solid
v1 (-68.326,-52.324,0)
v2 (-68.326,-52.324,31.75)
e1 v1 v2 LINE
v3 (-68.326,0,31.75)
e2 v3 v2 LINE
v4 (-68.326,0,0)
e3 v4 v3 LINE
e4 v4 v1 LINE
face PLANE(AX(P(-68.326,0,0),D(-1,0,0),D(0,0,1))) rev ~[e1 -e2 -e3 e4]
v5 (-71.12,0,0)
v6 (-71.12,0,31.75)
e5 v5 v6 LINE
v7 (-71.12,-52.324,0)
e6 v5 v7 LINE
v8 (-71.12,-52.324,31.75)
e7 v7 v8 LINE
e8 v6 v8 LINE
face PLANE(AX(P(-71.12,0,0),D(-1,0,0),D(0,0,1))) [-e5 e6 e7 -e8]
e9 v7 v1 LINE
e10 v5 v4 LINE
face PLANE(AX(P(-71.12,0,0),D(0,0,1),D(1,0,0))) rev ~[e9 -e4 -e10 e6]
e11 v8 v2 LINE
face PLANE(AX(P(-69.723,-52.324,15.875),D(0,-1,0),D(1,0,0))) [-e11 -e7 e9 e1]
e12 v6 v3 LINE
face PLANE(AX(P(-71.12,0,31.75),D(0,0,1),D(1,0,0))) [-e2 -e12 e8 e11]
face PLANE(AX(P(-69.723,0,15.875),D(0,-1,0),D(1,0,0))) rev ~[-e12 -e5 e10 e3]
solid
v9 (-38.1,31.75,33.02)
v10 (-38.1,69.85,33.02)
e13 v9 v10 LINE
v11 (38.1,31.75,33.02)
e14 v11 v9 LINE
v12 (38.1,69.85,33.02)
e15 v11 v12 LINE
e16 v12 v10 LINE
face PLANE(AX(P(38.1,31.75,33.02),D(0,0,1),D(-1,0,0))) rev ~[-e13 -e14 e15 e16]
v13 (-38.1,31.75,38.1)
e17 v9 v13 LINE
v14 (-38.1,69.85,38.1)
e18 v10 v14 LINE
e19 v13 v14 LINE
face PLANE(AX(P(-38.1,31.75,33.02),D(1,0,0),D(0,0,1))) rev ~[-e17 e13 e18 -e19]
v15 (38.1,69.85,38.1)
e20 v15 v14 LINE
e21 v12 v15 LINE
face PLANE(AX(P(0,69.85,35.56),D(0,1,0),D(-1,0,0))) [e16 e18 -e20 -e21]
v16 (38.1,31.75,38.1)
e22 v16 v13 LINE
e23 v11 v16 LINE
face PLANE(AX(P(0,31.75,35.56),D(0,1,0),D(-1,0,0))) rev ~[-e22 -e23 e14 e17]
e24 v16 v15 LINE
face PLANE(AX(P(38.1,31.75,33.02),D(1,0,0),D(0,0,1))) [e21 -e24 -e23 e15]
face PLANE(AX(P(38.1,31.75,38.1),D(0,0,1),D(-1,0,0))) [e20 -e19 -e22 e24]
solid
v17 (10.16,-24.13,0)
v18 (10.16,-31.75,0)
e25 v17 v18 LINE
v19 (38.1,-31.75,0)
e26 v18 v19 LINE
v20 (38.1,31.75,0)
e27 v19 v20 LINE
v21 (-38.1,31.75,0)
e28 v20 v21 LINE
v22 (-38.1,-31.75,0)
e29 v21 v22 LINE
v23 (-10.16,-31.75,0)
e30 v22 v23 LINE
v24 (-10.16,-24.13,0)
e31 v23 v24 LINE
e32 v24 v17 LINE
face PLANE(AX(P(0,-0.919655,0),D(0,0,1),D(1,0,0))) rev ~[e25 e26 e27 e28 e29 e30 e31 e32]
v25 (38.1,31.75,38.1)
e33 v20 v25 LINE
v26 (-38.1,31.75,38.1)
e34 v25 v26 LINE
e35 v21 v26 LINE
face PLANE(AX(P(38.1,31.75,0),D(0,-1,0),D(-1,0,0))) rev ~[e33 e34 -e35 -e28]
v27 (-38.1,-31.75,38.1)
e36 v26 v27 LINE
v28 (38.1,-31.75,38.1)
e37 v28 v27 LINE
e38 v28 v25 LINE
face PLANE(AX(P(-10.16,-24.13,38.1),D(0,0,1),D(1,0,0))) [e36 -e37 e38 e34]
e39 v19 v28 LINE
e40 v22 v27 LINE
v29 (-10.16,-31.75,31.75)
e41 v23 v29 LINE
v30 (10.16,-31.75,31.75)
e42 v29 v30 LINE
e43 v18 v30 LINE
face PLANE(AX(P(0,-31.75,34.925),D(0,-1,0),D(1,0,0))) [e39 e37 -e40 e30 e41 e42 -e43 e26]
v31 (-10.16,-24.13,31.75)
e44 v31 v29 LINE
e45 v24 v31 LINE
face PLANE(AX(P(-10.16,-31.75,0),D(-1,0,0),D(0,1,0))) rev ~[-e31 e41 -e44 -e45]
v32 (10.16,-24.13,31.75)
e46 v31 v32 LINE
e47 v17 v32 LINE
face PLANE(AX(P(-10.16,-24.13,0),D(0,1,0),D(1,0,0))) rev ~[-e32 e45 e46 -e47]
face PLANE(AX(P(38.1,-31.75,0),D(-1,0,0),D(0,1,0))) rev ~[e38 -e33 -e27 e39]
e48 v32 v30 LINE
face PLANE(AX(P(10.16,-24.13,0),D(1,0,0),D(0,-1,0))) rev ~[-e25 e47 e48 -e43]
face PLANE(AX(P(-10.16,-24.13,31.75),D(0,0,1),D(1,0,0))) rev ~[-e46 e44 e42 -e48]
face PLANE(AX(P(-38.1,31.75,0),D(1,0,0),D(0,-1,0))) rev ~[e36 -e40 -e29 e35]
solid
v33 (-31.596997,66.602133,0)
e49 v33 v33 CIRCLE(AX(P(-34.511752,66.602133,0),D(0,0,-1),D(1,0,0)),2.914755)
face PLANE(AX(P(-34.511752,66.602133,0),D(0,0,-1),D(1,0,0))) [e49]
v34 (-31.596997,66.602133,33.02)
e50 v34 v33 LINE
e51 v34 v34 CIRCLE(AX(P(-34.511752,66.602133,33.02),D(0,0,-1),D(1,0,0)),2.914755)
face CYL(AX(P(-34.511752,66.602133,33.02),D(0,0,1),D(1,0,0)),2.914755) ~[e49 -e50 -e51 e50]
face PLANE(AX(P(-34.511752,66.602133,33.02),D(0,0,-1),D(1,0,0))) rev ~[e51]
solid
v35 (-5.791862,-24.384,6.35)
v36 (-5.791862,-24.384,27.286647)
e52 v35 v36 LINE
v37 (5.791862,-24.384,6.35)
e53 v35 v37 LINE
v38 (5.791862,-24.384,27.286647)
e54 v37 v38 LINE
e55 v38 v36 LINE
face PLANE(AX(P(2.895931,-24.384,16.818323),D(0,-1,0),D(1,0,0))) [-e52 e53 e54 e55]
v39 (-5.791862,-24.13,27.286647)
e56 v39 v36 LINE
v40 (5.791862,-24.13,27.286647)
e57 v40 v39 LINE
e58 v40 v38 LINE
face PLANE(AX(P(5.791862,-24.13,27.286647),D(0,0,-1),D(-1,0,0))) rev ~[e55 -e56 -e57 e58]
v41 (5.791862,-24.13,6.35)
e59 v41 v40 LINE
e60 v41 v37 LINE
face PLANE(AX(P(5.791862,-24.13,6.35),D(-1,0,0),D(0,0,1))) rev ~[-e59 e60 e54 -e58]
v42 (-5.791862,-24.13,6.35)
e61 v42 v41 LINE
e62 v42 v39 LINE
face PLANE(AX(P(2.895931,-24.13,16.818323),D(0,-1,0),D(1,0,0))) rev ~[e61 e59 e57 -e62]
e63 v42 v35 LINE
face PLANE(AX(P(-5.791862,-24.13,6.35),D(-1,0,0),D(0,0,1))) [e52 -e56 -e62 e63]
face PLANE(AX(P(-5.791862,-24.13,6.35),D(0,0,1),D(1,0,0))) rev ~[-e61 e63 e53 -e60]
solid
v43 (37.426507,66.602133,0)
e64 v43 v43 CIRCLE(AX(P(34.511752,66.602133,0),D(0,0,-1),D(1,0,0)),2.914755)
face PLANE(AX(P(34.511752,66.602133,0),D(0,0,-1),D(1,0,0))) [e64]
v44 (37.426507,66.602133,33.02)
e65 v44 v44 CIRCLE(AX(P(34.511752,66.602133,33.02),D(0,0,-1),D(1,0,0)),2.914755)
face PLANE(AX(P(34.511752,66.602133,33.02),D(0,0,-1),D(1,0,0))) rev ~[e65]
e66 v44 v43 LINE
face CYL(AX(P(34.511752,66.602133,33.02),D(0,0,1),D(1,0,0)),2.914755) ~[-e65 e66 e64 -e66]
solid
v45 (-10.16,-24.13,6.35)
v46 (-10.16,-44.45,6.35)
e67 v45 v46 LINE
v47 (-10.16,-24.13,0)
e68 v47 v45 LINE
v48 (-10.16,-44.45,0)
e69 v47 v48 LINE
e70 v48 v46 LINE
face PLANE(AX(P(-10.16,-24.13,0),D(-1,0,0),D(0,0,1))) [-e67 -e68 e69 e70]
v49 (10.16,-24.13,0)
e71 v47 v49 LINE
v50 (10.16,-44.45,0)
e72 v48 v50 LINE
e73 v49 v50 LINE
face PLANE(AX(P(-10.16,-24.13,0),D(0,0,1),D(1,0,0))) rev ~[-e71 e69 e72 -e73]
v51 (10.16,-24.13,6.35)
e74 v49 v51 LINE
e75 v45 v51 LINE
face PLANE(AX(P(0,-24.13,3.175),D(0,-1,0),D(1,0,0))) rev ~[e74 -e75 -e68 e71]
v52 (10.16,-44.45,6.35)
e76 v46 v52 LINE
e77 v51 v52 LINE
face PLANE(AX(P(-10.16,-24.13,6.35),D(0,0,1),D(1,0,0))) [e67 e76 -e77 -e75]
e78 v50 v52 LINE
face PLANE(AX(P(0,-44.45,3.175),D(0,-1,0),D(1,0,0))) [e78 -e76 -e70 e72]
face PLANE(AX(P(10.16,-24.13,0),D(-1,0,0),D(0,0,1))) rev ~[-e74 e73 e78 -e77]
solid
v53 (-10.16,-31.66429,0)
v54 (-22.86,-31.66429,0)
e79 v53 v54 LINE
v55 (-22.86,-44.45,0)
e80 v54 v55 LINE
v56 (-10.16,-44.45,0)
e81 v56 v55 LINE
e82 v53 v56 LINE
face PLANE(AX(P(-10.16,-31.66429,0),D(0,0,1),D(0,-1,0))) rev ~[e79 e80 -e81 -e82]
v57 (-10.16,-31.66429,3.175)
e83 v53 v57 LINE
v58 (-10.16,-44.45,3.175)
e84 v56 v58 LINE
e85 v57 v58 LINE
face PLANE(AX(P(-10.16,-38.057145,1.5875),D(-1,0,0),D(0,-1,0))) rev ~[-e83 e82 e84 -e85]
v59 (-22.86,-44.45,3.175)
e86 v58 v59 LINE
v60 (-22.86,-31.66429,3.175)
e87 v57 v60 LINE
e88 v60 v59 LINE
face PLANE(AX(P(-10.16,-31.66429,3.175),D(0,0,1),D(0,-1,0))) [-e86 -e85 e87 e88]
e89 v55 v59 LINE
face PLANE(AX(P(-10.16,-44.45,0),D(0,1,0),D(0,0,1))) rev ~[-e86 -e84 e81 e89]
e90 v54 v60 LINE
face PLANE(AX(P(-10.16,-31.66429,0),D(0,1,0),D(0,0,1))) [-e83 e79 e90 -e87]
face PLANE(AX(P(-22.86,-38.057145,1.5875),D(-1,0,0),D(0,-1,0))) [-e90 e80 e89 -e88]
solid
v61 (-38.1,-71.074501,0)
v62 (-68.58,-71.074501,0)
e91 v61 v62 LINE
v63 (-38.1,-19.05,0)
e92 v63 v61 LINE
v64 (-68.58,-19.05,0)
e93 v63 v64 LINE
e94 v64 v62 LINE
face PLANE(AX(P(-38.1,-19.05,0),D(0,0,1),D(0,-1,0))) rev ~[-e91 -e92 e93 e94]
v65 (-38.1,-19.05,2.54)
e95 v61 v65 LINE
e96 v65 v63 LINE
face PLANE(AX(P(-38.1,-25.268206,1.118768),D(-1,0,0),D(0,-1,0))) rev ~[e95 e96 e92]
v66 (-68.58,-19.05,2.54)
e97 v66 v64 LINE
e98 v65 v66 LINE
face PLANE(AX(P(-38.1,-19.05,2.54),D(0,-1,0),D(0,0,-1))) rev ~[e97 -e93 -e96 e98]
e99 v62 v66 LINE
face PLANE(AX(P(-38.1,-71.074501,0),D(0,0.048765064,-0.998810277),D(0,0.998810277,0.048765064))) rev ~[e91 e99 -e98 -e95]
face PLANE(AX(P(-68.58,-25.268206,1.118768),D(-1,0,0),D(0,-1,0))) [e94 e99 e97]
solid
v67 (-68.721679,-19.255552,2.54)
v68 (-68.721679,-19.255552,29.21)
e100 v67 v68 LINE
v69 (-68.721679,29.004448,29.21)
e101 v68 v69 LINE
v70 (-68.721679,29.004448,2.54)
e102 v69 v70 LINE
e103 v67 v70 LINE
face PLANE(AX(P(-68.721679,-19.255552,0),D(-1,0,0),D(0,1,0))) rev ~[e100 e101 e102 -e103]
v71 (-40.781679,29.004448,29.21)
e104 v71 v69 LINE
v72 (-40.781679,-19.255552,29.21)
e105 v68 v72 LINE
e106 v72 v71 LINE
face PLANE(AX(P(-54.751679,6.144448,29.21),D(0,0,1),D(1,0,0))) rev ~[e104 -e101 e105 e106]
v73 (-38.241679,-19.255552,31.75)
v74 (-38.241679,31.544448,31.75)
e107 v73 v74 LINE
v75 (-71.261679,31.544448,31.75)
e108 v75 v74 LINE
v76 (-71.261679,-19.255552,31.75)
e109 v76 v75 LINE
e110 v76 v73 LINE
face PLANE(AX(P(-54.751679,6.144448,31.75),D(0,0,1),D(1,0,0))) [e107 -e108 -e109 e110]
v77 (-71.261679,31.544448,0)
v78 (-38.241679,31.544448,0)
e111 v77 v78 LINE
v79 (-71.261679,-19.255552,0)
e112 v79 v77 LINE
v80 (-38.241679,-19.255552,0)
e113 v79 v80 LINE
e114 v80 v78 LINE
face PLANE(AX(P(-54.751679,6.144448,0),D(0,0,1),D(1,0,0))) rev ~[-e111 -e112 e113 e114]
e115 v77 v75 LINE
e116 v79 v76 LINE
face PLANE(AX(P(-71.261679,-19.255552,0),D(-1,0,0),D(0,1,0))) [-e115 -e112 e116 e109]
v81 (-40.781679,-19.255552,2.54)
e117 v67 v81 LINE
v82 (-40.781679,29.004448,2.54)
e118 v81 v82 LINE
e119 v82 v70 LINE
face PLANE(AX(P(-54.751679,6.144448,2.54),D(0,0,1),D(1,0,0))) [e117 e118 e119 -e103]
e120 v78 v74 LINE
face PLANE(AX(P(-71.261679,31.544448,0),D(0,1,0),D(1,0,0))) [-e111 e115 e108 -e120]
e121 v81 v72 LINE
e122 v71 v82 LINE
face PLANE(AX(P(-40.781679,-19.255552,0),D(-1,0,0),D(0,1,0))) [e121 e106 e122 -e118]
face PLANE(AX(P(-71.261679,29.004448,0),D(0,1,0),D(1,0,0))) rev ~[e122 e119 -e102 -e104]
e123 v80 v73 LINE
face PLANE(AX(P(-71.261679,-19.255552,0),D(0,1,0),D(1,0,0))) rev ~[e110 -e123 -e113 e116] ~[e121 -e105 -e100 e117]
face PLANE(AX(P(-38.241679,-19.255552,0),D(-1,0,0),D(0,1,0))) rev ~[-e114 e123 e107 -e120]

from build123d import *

# Parameters (mm, degrees)
F1_DEPTH  = 38.1
F2_W      = 76.2
F2_H      = 5.08
F3_DEPTH  = 38.1
F5_W      = 20.32
F5_H      = 6.35
F6_DEPTH  = 7.62
F8_W      = 2.794
F8_H      = 31.75
F9_DEPTH  = 52.324
F10_DEPTH = 20.32
F11_W     = 12.7857104659
F11_H     = 3.175
F12_DEPTH = 12.7
F13_W     = 5.791861964
F13_H     = 20.9366468877
F14_DEPTH = 0.254
F15_W     = 33.02
F15_H     = 50.8
F16_DEPTH = 31.75
F17_DEPTH = 30.48
F18_T     = -2.54
F19_R     = 2.9147550464
F20_DEPTH = 33.02


with BuildPart() as f1:
    # F0 (on Top) → F1 (new body)
    with BuildSketch(Plane.XY):
        Polygon((-38.1, -31.75), (-10.16, -31.75), (-10.16, -24.13), (10.16, -24.13), (10.16, -31.75), (38.1, -31.75), (38.1, 31.75), (-38.1, 31.75), (-38.1, -19.05), align=None)
    extrude(amount=F1_DEPTH)

    # F5 (on face) → F6 (join)
    with BuildSketch(Plane.XZ.offset(24.13)):
        with Locations((0, 34.925)):
            Rectangle(F5_W, F5_H)
    extrude(amount=F6_DEPTH)


with BuildPart() as f3:
    # F2 (on face) → F3 (new body)
    with BuildSketch(Plane(origin=(0, 31.75, 0), x_dir=(-1, 0, 0), z_dir=(0, 1, 0))):
        with Locations((0, 35.56)):
            Rectangle(F2_W, F2_H)
    extrude(amount=F3_DEPTH)


with BuildPart() as f9:
    # F8 (on Front) → F9 (new body)
    with BuildSketch(Plane.XZ):
        with Locations((-69.723, 15.875)):
            Rectangle(F8_W, F8_H)
    extrude(amount=F9_DEPTH)


with BuildPart() as f10:
    # F5 (on face) → F10 (new body)
    with BuildSketch(Plane.XZ.offset(24.13)):
        with Locations((0, 3.175)):
            Rectangle(F5_W, F5_H)
    extrude(amount=F10_DEPTH)


with BuildPart() as f12:
    # F11 (on face) → F12 (new body)
    with BuildSketch(Plane(origin=(-10.16, 0, 0), x_dir=(0, -1, 0), z_dir=(-1, 0, 0))):
        with Locations((38.057144767, 1.5875)):
            Rectangle(F11_W, F11_H)
    extrude(amount=F12_DEPTH)


with BuildPart() as f14:
    # F13 (on face) → F14 (new body)
    with BuildSketch(Plane.XZ.offset(24.13)):
        with Locations((2.895930982, 16.8183234438)):
            Rectangle(F13_W, F13_H)
        with Locations((-2.895930982, 16.8183234438)):
            Rectangle(F13_W, F13_H)
    extrude(amount=F14_DEPTH)


with BuildPart() as f16:
    # F15 (on Top) → F16 (new body)
    with BuildSketch(Plane.XY):
        with Locations((-54.7516793013, 6.1444475591)):
            Rectangle(F15_W, F15_H)
    extrude(amount=F16_DEPTH)

    # F18
    f18_openings = [f16.faces().sort_by_distance(p)[0] for p in [
        (-54.751679, -19.255552, 15.875),
    ]]
    offset(amount=F18_T, openings=f18_openings)


with BuildPart() as f17:
    # F7 (on face) → F17 (new body)
    with BuildSketch(Plane(origin=(-38.1, 0, 0), x_dir=(0, -1, 0), z_dir=(-1, 0, 0))):
        Polygon((31.75, 1.9199459951), (19.05, 2.54), (19.05, 0), (31.75, 0), align=None)
        Polygon((71.07450068, 0), (31.75, 1.9199459951), (31.75, 0), align=None)
    extrude(amount=F17_DEPTH)


with BuildPart() as f20:
    # F19 (on face) → F20 (new body)
    with BuildSketch(Plane(origin=(0, 0, 33.02), x_dir=(1, 0, 0), z_dir=(0, 0, -1))):
        with Locations((34.5117524266, -66.6021332145)):
            Circle(F19_R)
    extrude(amount=F20_DEPTH)


with BuildPart() as f20b:
    # F19 (on face) → F20, piece 2 (new body)
    with BuildSketch(Plane(origin=(0, 0, 33.02), x_dir=(1, 0, 0), z_dir=(0, 0, -1))):
        with Locations((-34.5117524266, -66.6021332145)):
            Circle(F19_R)
    extrude(amount=F20_DEPTH)


solid = Compound([f1.part, f3.part, f9.part, f10.part, f12.part, f14.part, f16.part, f17.part, f20.part, f20b.part])
